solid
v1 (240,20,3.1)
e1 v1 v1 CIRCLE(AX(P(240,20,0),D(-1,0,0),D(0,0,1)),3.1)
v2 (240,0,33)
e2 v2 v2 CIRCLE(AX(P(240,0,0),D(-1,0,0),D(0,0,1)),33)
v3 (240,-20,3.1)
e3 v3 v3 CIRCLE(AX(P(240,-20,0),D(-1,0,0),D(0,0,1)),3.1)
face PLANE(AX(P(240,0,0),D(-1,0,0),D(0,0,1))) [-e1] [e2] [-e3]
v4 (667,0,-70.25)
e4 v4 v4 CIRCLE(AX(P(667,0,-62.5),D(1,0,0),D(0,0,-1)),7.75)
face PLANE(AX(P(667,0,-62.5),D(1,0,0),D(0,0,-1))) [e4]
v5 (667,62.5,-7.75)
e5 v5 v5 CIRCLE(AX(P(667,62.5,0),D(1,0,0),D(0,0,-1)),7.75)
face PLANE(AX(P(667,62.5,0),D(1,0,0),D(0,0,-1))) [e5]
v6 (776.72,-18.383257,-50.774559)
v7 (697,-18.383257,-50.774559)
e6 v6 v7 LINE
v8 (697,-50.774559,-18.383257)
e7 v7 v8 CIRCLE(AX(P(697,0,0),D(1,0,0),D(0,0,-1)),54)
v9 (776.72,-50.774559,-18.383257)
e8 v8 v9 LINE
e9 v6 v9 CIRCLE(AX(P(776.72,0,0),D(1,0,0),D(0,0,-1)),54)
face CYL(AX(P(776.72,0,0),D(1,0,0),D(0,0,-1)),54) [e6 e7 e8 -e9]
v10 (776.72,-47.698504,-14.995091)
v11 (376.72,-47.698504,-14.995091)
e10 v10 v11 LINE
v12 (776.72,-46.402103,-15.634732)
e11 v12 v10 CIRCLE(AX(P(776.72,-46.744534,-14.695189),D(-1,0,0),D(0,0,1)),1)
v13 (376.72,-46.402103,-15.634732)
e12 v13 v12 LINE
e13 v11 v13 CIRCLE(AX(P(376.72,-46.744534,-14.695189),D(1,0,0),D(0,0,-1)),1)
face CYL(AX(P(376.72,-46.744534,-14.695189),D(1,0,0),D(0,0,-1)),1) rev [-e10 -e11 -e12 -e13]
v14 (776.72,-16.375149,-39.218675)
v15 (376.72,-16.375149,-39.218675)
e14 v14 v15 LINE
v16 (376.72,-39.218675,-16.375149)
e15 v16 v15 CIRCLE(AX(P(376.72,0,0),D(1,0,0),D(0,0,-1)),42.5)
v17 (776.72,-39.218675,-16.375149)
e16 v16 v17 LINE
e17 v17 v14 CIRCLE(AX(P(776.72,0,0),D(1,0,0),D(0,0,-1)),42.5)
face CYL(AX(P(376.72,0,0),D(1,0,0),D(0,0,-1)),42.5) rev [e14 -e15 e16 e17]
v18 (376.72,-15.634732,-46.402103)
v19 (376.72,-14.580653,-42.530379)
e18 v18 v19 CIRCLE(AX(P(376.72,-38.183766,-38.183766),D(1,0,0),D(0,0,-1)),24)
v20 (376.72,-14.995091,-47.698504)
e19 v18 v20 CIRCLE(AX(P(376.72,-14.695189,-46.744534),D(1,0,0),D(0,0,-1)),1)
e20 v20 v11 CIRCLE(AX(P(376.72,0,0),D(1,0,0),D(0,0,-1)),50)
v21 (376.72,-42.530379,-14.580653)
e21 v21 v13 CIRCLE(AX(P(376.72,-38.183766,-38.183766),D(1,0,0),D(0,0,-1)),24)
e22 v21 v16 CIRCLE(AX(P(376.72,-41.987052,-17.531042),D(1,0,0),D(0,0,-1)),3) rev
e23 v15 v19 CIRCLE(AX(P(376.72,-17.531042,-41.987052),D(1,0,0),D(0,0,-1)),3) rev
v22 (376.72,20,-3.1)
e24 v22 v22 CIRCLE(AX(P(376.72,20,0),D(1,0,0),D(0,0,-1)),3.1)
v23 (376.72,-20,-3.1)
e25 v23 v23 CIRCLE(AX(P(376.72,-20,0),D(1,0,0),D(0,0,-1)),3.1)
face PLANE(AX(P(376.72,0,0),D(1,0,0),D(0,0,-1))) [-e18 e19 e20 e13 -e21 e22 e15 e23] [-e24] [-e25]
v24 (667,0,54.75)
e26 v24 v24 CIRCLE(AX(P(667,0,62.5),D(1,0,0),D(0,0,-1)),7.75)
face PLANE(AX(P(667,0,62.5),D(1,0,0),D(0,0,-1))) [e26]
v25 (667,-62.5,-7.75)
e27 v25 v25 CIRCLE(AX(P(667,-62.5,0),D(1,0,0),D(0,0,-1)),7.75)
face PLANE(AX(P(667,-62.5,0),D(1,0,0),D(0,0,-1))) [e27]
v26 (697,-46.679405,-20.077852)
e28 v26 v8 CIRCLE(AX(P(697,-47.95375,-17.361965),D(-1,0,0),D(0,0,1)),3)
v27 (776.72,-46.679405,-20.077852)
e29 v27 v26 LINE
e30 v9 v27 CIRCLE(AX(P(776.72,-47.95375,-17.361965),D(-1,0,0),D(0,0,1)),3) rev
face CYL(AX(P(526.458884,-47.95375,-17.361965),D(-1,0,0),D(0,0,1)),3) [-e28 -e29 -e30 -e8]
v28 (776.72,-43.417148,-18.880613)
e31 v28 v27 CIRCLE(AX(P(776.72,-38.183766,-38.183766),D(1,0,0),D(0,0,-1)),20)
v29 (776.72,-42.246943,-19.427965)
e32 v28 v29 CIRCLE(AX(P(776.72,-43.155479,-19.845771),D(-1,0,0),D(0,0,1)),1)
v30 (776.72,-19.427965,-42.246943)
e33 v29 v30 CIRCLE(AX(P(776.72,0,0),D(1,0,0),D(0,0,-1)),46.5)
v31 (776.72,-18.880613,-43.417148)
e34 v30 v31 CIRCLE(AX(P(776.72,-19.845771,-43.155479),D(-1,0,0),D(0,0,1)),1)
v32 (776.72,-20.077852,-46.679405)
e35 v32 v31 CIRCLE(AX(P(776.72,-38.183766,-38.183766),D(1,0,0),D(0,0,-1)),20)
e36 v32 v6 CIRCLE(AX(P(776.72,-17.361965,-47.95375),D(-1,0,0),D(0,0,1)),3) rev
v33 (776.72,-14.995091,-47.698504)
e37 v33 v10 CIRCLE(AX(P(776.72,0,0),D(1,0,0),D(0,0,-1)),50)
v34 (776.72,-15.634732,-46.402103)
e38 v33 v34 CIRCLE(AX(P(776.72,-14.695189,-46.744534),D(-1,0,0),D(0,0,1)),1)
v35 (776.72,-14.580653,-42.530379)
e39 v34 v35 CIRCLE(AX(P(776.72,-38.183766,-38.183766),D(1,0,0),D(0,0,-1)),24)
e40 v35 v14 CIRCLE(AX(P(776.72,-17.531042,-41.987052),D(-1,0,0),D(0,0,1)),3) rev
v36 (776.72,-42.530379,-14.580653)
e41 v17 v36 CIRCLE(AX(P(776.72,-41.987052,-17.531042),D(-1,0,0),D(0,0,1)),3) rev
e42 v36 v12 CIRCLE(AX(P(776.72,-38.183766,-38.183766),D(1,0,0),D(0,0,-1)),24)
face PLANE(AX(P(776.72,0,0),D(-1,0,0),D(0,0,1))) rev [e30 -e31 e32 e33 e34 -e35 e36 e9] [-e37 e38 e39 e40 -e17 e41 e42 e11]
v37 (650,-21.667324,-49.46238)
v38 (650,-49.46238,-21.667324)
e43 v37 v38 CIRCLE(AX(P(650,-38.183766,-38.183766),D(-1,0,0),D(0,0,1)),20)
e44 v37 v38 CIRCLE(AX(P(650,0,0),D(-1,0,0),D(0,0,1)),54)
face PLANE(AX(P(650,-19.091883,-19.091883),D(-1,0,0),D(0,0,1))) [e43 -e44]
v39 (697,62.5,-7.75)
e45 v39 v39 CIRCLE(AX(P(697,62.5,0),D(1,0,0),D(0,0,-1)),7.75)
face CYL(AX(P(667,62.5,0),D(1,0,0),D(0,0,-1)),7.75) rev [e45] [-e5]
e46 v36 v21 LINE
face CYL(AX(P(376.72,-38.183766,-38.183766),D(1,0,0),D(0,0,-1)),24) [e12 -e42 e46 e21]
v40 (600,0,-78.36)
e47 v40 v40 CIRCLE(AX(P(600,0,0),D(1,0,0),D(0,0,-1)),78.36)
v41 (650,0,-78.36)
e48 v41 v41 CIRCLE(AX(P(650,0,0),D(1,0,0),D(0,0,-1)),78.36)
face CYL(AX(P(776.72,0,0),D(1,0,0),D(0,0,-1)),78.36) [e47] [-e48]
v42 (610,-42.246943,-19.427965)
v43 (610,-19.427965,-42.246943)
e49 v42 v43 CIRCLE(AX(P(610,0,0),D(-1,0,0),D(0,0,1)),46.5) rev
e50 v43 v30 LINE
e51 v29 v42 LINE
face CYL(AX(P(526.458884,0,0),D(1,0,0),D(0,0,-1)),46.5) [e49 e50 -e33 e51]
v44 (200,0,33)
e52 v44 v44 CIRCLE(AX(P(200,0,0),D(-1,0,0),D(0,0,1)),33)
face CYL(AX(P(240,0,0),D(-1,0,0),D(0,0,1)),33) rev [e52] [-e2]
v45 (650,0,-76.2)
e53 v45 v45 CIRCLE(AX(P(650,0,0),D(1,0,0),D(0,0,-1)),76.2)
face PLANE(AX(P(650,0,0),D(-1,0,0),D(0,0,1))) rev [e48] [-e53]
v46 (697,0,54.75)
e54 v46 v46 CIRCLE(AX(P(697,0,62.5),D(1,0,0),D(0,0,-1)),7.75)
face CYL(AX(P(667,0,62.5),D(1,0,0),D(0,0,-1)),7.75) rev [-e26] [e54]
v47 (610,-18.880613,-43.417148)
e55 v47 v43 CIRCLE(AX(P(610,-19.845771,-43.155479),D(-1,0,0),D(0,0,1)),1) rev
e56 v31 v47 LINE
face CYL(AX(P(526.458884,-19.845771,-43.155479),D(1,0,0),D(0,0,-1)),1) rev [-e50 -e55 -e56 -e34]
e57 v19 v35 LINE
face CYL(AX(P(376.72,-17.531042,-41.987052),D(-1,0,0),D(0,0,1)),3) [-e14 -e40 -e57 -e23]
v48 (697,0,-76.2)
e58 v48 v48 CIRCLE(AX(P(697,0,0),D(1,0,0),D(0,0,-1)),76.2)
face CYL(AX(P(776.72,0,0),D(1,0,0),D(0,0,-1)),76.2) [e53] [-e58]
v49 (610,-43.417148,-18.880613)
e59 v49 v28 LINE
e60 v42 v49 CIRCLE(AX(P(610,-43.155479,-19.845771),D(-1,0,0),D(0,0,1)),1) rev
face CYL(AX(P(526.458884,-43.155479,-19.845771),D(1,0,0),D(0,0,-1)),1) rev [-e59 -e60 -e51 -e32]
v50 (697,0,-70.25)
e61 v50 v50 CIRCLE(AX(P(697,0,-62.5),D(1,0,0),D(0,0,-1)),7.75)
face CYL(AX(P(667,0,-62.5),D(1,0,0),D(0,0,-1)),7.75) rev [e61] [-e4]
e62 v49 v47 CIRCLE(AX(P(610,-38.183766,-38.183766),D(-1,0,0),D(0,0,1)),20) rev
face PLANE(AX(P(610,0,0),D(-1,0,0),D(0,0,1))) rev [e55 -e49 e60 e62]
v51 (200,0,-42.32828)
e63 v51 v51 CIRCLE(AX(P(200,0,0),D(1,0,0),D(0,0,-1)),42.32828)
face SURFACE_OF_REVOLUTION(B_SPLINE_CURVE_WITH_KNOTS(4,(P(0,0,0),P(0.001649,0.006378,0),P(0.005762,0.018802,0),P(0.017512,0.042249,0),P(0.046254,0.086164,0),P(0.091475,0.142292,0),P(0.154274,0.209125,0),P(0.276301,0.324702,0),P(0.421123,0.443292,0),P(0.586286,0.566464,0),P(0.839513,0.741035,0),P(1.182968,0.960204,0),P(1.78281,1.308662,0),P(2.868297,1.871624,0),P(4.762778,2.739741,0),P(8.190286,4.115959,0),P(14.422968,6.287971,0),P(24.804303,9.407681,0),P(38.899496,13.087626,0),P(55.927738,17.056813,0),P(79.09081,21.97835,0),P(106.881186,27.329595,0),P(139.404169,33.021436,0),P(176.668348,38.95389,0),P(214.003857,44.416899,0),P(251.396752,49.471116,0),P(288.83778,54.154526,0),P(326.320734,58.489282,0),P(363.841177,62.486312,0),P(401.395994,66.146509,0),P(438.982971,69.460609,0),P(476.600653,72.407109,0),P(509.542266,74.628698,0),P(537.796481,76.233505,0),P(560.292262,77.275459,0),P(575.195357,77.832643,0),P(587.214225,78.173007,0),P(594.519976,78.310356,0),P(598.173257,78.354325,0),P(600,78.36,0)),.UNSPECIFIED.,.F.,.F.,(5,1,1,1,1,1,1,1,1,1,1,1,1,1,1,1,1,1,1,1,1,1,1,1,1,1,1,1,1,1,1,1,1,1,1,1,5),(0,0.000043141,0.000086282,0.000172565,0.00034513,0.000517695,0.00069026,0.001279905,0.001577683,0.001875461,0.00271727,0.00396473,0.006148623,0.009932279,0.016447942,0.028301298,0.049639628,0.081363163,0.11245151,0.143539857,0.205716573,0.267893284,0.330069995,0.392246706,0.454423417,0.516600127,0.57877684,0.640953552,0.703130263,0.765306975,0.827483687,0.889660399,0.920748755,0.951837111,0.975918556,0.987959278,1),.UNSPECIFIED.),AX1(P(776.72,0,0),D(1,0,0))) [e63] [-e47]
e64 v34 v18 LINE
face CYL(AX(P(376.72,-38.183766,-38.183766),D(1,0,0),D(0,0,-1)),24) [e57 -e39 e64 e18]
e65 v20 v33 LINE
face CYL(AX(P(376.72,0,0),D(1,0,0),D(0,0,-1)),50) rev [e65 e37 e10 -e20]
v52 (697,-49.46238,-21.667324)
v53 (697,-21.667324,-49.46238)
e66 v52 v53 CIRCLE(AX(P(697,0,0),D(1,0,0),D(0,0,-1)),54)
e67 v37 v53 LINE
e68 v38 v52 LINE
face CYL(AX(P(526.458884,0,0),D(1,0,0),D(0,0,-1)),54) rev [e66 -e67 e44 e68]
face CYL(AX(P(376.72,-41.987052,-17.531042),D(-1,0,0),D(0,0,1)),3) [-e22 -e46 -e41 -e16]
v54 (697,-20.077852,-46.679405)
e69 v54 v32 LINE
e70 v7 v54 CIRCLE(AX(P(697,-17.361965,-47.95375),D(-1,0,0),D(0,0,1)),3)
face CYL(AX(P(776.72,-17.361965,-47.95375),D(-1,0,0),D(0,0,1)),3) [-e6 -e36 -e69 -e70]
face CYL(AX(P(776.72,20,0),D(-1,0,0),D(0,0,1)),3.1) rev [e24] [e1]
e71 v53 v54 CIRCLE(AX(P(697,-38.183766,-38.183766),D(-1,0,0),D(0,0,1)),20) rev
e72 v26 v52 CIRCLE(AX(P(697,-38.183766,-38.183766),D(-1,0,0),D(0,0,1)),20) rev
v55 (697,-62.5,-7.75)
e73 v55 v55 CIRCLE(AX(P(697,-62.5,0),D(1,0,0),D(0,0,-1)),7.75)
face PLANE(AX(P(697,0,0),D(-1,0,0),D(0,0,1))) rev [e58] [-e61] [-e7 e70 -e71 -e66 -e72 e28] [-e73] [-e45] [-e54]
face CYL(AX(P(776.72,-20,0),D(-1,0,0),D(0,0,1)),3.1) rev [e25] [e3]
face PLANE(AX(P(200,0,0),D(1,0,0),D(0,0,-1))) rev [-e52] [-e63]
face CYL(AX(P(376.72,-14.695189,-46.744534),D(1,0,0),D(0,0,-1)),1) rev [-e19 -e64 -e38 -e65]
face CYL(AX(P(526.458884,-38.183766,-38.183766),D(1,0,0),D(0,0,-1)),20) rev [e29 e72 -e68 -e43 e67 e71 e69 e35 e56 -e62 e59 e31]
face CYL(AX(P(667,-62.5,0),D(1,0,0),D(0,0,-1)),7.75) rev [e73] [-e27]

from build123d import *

# Parameters (mm, degrees)
CUT_EXTRUDE1_DEPTH = 400
SKETCH3_R          = 33
SKETCH3_R_2        = 3.1000000000000028
CUT_EXTRUDE2_DEPTH = 40
SKETCH3_2_R        = 3.1000000000000028
CUT_EXTRUDE4_DEPTH = 588.2704126987336
SKETCH4_R          = 7.750000000000002
SKETCH4_R_2        = 7.749999999999998
SKETCH4_R_3        = 7.75
CUT_EXTRUDE5_DEPTH = 30
CUT_EXTRUDE6_START = -166.72
CUT_EXTRUDE6_DEPTH = 166.72
CUT_EXTRUDE7_START = -166.72
CUT_EXTRUDE7_DEPTH = 40
FILLET1_R          = 3
FILLET2_R          = 1


# Read off the part's stored shape, not the designer's step: Cut-Extrude7
with BuildPart() as part:
    # Sketch1 → Revolve1 (revolve)
    with BuildSketch(Plane.XY, mode=Mode.PRIVATE) as revolve1_sk:
        with BuildLine():
            Line((650.0000000000001, 78.36), (600.0000000000001, 78.35999999999999))
            add(Edge.make_bspline(
                [(200.00000000000358, 42.32828037010144), (208.17052038042252, 43.51395402277683), (225.68488706430128, 45.99527814756255), (252.5646252490451, 49.61720291886234), (288.8377795121088, 54.154525537406215), (326.32073414086074, 58.489281573967666), (363.84117713275197, 62.4863121261995), (401.3959942076804, 66.1465092198773), (438.98297125108434, 69.46060873551288), (476.60065297069735, 72.40710938265987), (509.54226569024473, 74.62869781075653), (537.7964811389767, 76.23350465282824), (560.2922621801154, 77.27545940077594), (575.1953567037801, 77.83264328043563), (587.2142250450652, 78.17300672656529), (594.5199761893905, 78.31035588184413), (598.173256760109, 78.35432466011183), (600.0000000000001, 78.35999999999999)],
                knots=[0.33782774337518406, 0.33782774337518406, 0.33782774337518406, 0.33782774337518406, 0.33782774337518406, 0.3922467059008778, 0.45442341660838875, 0.5166001272068571, 0.5787768404127641, 0.6409535517353824, 0.7031302632972144, 0.7653069754242735, 0.8274836869805778, 0.8896603985814769, 0.9207487548355946, 0.9518371110897123, 0.9759185555448562, 0.9879592777724281, 1, 1, 1, 1, 1], degree=4))
            Line((200.0000000000036, 42.32828037010143), (200, -7.43e-14))
            Line((200, 0), (776.72, 0))
            Line((776.72, 0), (776.72, 54))
            Line((776.72, 54), (697.0000000000002, 54))
            Line((697.0000000000002, 54), (697.0000000000002, 76.20000000000005))
            Line((697.0000000000002, 76.20000000000005), (650.0000000000001, 76.20000000000005))
            Line((650.0000000000001, 76.20000000000005), (650.0000000000001, 78.36))
        make_face()
    revolve(revolve1_sk.sketch.rotate(Axis((776.72, 0, 0), (-1, 0, 0)), 90), axis=Axis((776.72, 0, 0), (-1, 0, 0)))

    # Sketch2 → Cut-Extrude1 (cut)
    with BuildSketch(Plane(origin=(776.72, 0, 0), x_dir=(0, 0, -1), z_dir=(1, 0, 0))):
        with BuildLine():
            ThreePointArc((47.36738574096539, -16.010333165383813), (-35.35533905932756, 35.35533905932719), (16.01033316538431, -47.367385740965226))
            ThreePointArc((16.010333165384957, -47.36738574096489), (14.843408327061695, -43.77194076139418), (14.25549204864172, -40.03786890496388))
            ThreePointArc((14.25549204864269, -40.03786890496403), (30.05203820042843, -30.05203820042811), (40.037868904964185, -14.255492048642266))
            ThreePointArc((40.03786890496402, -14.255492048641287), (43.77194076139434, -14.843408327061226), (47.36738574096508, -16.01033316538445))
        make_face()
    extrude(amount=-CUT_EXTRUDE1_DEPTH, mode=Mode.SUBTRACT)

    # Sketch3 → Cut-Extrude2 (cut)
    with BuildSketch(Plane.ZY.offset(-200.00000000000273)):
        Circle(SKETCH3_R)
        with Locations((0, 20)):
            Circle(SKETCH3_R_2, mode=Mode.SUBTRACT)
        with Locations((0, -20)):
            Circle(SKETCH3_R_2, mode=Mode.SUBTRACT)
    extrude(amount=-CUT_EXTRUDE2_DEPTH, mode=Mode.SUBTRACT)

    # Sketch3<2> → Cut-Extrude4 (cut, through all)
    with BuildSketch(Plane.ZY.offset(-200.00000000000273)):
        with Locations((0, 20)):
            Circle(SKETCH3_2_R)
        with Locations((0, -20)):
            Circle(SKETCH3_2_R)
    extrude(amount=-CUT_EXTRUDE4_DEPTH, mode=Mode.SUBTRACT)

    # Sketch4 → Cut-Extrude5 (cut)
    with BuildSketch(Plane(origin=(697.0000000000002, 0, 0), x_dir=(0, 0, -1), z_dir=(1, 0, 0))):
        with Locations((0, 62.5)):
            Circle(SKETCH4_R)
        with Locations((62.499999999999986, -2.1825e-13)):
            Circle(SKETCH4_R_2)
        with Locations((-4.3715e-13, -62.5)):
            Circle(SKETCH4_R_3)
        with Locations((-62.49999999999999, 6.5573e-13)):
            Circle(SKETCH4_R_2)
    extrude(amount=-CUT_EXTRUDE5_DEPTH, mode=Mode.SUBTRACT)

    # Sketch2<3> → Cut-Extrude6 (cut)
    with BuildSketch(Plane(origin=(776.72, 0, 0), x_dir=(0, 0, -1), z_dir=(1, 0, 0)).offset(CUT_EXTRUDE6_START)):
        with BuildLine():
            ThreePointArc((18.674162122276517, -42.585510083018875), (19.845504593214095, -46.16550545726443), (21.667324002424465, -49.462380356933224))
            ThreePointArc((21.66732400242451, -49.46238035693348), (38.18376618407376, -38.18376618407337), (49.4623803569337, -21.667324002424003))
            ThreePointArc((49.46238035693346, -21.667324002423932), (46.16550545726464, -19.845504593213597), (42.58551008301907, -18.67416212227606))
            ThreePointArc((42.58551008301935, -18.674162122276265), (32.880465325174626, -32.88046532517429), (18.674162122276698, -42.58551008301916))
        make_face()
    extrude(amount=CUT_EXTRUDE6_DEPTH, mode=Mode.SUBTRACT)

    # Cut-Extrude7 outline → Cut-Extrude7 (cut)
    with BuildSketch(Plane(origin=(776.72, 0, 0), x_dir=(0, 0, -1), z_dir=(1, 0, 0)).offset(CUT_EXTRUDE7_START)):
        with BuildLine():
            ThreePointArc((49.462380357, -21.667324002), (38.183766184, -38.183766184), (21.667324002, -49.462380357))
            ThreePointArc((21.667324002, -49.462380357), (52.325901808, -52.325901808), (49.462380357, -21.667324002))
        make_face()
    extrude(amount=CUT_EXTRUDE7_DEPTH, mode=Mode.SUBTRACT)

    # Fillet1
    # the kernel refuses this fillet: 3 mm, written as the material it takes off along each edge
    with BuildSketch(Plane(origin=(783.0040750376627, -40.03786890496436, -14.255492048641756), x_dir=(0, 0.36048933664361255, -0.9327633344885766), z_dir=(-1, 0, 0))) as fillet1_piece_1:
        with BuildLine():
            CenterArc((2.3526530908588352, 2.998927692547355), FILLET1_R, 190.6958961912189, 77.77213613267259)
            ThreePointArc((-0.5952251863106816, 2.4421389866704493), (-0.3296065941102598, 1.2132715607510574), (0, 0))
            ThreePointArc((0, 0), (1.1362245041079626, 0.01519102224578455), (2.2724490082159248, 3e-17))
        make_face()
    extrude(amount=406.28407503766266, mode=Mode.SUBTRACT)
    with BuildSketch(Plane(origin=(783.0040750376628, -14.255492048641326, -40.03786890496452), x_dir=(0, -0.12935906708338796, -0.9915978175466682), z_dir=(-1, 0, 0))) as fillet1_piece_2:
        with BuildLine():
            CenterArc((2.356528139123201, 2.995883676075499), FILLET1_R, 195.22966173823434, 77.77213613267247)
            ThreePointArc((-0.5381137542877349, 2.207817492997983), (-0.25429790806270375, 1.1075059660548925), (0, 0))
            ThreePointArc((0, 0), (1.2568150075323716, -0.0329305913960081), (2.513630015064742, 0))
        make_face()
    extrude(amount=406.2840750376628, mode=Mode.SUBTRACT)
    with BuildSketch(Plane(origin=(697.0000000000002, -49.46238035693335, -21.667324002424486), x_dir=(0, -0.3710376913926641, 0.9286178070476584), z_dir=(1, 0, 0))) as fillet1_piece_3:
        with BuildLine():
            CenterArc((3.4382745469761065, -2.998391169718282), FILLET1_R, 88.12348720794618, 95.23374468145443)
            ThreePointArc((0.4434230907932443, -3.1740748496643687), (0.2853925875390597, -1.5781410862550613), (0, 0))
            ThreePointArc((0, 0), (1.7682554813020526, 0.0289589450709421), (3.5365109626041082, -1.1e-16))
        make_face()
    extrude(amount=88.56127740651004, mode=Mode.SUBTRACT)
    with BuildSketch(Plane(origin=(697.0000000000002, -21.667324002423964, -49.46238035693357), x_dir=(0, 0.9286178070476617, -0.3710376913926558), z_dir=(1, 0, 0))) as fillet1_piece_4:
        with BuildLine():
            CenterArc((3.438274546976126, 2.998391169718279), FILLET1_R, 176.64276811059946, 95.23374468145443)
            ThreePointArc((0.44342309079326614, 3.174074849664362), (0.28539258753907326, 1.5781410862550511), (0, 0))
            ThreePointArc((0, 0), (1.7682554813020637, -0.02895894507093817), (3.53651096260413, 5e-17))
        make_face()
    extrude(amount=88.56127740651004, mode=Mode.SUBTRACT)

    # Fillet2
    fillet2_edges = [part.edges().sort_by_distance(p)[0] for p in [
        (576.72, -47.36738574096506, -16.010333165384637),
        (576.72, -16.01033316538413, -47.36738574096523),
        (693.36, -18.67416212227616, -42.58551008301921),
        (693.36, -42.58551008301902, -18.674162122276606),
    ]]
    fillet(fillet2_edges, radius=FILLET2_R)


solid = part.part
